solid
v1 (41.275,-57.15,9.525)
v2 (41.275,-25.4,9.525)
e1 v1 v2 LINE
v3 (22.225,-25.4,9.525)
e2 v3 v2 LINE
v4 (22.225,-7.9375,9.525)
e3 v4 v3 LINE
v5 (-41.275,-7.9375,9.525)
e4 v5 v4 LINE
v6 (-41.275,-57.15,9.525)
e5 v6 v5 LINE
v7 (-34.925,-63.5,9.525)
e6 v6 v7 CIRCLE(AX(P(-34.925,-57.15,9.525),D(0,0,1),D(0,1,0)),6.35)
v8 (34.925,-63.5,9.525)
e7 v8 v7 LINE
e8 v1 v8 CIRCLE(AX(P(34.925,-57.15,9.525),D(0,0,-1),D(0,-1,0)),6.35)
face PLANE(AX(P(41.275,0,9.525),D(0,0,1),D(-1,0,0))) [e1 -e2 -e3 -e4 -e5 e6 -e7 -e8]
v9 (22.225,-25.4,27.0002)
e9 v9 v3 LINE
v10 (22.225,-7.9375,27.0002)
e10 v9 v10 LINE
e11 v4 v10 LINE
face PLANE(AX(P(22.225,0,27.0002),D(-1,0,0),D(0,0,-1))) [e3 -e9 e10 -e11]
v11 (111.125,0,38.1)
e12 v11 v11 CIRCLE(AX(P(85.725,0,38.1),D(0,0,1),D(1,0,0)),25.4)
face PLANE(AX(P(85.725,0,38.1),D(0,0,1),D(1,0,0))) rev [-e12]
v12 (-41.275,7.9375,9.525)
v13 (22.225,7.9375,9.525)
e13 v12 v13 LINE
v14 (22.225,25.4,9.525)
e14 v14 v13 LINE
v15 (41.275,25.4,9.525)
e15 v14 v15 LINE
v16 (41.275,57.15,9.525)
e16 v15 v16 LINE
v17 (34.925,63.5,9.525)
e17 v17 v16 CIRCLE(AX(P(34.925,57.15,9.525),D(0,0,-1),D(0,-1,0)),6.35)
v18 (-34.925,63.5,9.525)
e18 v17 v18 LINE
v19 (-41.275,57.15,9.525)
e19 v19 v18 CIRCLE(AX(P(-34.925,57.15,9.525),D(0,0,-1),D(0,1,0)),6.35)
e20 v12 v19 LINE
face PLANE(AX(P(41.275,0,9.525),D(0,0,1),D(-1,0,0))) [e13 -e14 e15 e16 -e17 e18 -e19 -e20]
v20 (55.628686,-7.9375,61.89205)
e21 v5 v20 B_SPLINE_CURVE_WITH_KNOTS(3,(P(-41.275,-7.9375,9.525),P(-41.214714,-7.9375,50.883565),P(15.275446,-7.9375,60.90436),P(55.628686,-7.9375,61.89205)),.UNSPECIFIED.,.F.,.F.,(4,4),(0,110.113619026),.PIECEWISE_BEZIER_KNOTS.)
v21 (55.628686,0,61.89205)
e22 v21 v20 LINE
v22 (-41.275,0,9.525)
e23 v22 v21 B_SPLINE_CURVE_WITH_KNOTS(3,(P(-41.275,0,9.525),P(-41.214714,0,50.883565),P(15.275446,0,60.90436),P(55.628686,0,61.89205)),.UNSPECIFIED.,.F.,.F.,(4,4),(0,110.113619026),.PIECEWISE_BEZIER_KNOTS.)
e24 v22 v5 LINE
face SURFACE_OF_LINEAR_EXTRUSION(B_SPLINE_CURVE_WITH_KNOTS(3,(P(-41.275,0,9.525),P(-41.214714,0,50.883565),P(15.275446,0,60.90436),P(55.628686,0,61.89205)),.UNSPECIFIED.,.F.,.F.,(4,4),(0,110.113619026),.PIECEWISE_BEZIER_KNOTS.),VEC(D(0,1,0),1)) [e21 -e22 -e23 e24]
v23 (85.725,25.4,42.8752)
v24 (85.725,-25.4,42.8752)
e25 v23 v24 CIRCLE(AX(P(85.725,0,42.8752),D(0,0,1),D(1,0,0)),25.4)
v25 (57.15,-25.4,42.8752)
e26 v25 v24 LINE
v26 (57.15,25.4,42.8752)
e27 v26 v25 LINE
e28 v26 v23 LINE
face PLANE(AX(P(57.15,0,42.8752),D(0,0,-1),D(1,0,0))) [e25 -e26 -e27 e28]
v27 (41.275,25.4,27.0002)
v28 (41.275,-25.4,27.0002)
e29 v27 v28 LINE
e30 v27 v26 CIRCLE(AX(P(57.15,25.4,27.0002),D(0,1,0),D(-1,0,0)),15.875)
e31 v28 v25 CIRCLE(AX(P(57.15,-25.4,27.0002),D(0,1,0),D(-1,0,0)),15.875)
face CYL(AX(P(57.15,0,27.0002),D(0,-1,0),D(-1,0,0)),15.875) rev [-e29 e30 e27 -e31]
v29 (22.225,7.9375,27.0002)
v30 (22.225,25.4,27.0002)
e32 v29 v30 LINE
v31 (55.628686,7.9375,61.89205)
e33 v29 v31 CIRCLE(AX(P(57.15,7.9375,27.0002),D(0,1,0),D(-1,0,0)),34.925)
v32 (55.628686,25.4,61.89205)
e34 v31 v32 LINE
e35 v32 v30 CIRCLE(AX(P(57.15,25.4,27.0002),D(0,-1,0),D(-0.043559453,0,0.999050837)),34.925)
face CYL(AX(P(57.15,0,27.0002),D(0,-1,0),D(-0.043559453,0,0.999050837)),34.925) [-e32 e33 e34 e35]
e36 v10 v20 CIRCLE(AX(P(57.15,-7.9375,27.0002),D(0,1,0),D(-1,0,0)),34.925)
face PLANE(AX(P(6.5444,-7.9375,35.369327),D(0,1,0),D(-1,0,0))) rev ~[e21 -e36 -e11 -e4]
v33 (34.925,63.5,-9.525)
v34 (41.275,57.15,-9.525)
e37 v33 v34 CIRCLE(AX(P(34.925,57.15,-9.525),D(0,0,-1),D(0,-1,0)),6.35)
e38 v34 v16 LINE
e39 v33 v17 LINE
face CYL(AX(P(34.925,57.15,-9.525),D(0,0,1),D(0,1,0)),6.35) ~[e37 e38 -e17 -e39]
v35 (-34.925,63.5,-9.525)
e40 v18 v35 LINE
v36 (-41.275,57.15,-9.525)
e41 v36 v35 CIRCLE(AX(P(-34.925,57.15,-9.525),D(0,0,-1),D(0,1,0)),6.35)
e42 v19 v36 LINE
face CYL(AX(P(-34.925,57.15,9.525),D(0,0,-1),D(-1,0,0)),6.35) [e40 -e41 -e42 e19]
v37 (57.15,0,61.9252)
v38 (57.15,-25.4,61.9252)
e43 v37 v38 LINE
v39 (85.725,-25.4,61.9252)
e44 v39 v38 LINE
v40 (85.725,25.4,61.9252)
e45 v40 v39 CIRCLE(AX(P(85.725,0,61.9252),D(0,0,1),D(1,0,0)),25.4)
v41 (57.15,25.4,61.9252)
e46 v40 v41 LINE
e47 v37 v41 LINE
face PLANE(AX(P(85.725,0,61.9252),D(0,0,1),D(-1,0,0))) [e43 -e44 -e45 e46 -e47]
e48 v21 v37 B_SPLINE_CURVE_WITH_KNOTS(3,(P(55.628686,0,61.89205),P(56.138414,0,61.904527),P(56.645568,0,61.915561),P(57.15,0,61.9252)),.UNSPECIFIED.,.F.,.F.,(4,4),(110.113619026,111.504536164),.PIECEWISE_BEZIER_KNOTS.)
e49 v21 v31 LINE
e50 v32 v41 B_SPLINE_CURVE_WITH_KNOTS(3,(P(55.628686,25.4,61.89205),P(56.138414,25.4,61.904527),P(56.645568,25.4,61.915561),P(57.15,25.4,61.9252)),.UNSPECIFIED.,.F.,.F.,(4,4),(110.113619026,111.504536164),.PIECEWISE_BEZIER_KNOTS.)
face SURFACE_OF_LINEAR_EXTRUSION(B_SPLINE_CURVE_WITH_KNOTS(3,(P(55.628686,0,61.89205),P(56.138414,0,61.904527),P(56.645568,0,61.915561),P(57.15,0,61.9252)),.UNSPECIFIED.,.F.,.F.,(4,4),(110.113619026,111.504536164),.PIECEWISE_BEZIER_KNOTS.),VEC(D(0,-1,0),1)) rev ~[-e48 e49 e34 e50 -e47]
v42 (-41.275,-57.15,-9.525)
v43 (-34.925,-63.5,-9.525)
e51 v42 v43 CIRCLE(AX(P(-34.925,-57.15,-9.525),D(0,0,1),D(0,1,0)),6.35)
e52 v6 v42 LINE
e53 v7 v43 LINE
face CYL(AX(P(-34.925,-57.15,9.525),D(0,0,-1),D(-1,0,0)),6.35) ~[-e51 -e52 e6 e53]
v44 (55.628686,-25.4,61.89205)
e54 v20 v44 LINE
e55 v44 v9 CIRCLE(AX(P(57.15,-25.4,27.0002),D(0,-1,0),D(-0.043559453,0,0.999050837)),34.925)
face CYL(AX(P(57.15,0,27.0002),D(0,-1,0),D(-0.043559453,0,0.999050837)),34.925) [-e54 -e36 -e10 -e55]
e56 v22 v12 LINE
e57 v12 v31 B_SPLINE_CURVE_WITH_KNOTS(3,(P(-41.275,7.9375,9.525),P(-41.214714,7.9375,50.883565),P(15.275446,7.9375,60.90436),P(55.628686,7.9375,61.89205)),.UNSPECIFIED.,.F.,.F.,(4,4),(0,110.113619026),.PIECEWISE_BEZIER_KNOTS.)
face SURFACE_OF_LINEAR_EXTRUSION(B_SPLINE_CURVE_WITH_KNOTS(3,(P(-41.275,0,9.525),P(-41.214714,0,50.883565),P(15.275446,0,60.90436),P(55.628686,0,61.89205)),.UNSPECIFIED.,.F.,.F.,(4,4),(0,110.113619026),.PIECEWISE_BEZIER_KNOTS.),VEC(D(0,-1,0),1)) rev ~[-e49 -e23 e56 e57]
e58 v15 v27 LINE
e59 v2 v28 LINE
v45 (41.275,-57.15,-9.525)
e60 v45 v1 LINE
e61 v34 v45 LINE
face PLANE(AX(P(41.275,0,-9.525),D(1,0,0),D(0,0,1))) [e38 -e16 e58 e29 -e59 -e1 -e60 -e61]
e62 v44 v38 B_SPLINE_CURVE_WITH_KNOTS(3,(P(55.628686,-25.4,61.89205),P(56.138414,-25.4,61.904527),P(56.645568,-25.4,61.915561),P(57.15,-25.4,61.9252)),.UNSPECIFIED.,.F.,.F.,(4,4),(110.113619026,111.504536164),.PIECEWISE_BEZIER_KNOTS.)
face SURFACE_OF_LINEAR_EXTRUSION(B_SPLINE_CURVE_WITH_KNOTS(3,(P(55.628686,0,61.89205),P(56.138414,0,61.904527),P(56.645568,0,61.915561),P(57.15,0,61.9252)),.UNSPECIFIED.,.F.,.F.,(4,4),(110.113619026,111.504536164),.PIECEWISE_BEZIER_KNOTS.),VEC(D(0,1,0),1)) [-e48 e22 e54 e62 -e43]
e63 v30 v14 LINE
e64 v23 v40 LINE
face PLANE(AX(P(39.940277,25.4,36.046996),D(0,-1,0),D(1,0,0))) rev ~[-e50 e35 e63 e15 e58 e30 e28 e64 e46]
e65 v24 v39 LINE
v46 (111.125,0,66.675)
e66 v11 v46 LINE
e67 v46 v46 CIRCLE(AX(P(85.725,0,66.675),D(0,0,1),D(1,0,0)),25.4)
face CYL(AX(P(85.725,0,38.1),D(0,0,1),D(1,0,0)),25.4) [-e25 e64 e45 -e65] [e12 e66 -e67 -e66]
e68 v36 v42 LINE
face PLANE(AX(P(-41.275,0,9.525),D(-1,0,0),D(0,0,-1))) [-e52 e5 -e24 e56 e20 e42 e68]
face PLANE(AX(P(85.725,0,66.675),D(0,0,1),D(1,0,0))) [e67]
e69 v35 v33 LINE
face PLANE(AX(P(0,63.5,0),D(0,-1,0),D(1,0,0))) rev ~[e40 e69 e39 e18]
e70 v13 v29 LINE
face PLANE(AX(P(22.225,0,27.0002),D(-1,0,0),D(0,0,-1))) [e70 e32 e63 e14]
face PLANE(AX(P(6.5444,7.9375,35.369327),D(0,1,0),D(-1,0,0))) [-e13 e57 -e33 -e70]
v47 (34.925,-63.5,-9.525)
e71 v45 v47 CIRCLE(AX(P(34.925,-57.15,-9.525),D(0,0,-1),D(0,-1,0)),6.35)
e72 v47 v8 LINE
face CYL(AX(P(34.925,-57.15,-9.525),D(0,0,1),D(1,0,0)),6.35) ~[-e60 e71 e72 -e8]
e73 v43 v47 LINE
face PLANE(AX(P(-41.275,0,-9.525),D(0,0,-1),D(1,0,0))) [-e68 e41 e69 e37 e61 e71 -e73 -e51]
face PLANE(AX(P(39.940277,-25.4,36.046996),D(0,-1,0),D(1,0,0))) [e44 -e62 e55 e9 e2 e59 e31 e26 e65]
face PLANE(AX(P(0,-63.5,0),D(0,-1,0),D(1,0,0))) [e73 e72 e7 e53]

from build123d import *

# Parameters (mm, degrees)
F1_DEPTH = 63.5
F0_W     = 25.4
F0_H     = 19.05
F2_DEPTH = 25.4
F3_DEPTH = 7.9375
F5_R     = 6.35
F6_R     = 6.35


# Not quite as in the source:
# - a feature names something its author has since deleted; it is built from what else it names


with BuildPart() as f1:
    # F0 (on Front) → F1 (new body, symmetric)
    with BuildSketch(Plane.XZ):
        Polygon((22.225, 9.525), (-41.275, 9.525), (-41.275, -9.525), (41.275, -9.525), (41.275, 9.525), align=None)
    extrude(amount=F1_DEPTH, both=True)

    # F0 (on Front) → F2 (join, symmetric)
    with BuildSketch(Plane.XZ):
        with BuildLine():
            Line((22.225, 27.0002), (22.225, 9.525))
            Line((22.225, 9.525), (41.275, 9.525))
            Line((41.275, 9.525), (41.275, 27.0002))
            ThreePointArc((41.275, 27.0002), (45.9246798487, 38.2255201513), (57.15, 42.8752))
            Line((57.15, 42.8752), (60.325, 42.8752))
            Line((60.325, 42.8752), (60.325, 61.9252))
            Line((60.325, 61.9252), (57.15, 61.9252))
            add(Edge.make_bspline(
                [(55.6286861057, 61.8920504673), (56.1384142752, 61.9045266367), (56.6455676592, 61.915561496), (57.15, 61.9252)],
                knots=[110.1136190258, 110.1136190258, 110.1136190258, 110.1136190258, 111.5045361635, 111.5045361635, 111.5045361635, 111.5045361635], degree=3))
            ThreePointArc((55.6286861057, 61.8920504673), (31.9221630658, 51.1520502111), (22.225, 27.0002))
        make_face()
        with Locations((73.025, 52.4002)):
            Rectangle(F0_W, F0_H)
    extrude(amount=F2_DEPTH, both=True)

    # F0 (on Front) → F3 (join, symmetric)
    with BuildSketch(Plane.XZ):
        with BuildLine():
            add(Edge.make_bspline(
                [(-41.275, 9.525), (-41.2147135228, 50.8835652719), (15.2754458257, 60.9043595954), (55.6286861057, 61.8920504673)],
                knots=[0, 0, 0, 0, 110.1136190258, 110.1136190258, 110.1136190258, 110.1136190258], degree=3))
            Line((-41.275, 9.525), (22.225, 9.525))
            Line((22.225, 9.525), (22.225, 27.0002))
            ThreePointArc((22.225, 27.0002), (31.9221630658, 51.1520502111), (55.6286861057, 61.8920504673))
        make_face()
    extrude(amount=F3_DEPTH, both=True)

    # F0 (on Front) → F4 (revolve)
    with BuildSketch(Plane.XZ):
        Polygon((85.725, 66.675), (85.725, 61.9252), (85.725, 42.8752), (85.725, 38.1), (111.125, 38.1), (111.125, 66.675), align=None)
    revolve(axis=Axis((85.725, 0, 52.4002), (0, 0, 1)))

    # F5
    f5_edges = [f1.edges().sort_by_distance(p)[0] for p in [
        (-41.275, 63.5, 0),
    ]]
    fillet(f5_edges, radius=F5_R)

    # F6
    f6_edges = [f1.edges().sort_by_distance(p)[0] for p in [
        (-41.275, -63.5, 0),
        (41.275, 63.5, 0),
        (41.275, -63.5, 0),
    ]]
    fillet(f6_edges, radius=F6_R)


solid = f1.part
